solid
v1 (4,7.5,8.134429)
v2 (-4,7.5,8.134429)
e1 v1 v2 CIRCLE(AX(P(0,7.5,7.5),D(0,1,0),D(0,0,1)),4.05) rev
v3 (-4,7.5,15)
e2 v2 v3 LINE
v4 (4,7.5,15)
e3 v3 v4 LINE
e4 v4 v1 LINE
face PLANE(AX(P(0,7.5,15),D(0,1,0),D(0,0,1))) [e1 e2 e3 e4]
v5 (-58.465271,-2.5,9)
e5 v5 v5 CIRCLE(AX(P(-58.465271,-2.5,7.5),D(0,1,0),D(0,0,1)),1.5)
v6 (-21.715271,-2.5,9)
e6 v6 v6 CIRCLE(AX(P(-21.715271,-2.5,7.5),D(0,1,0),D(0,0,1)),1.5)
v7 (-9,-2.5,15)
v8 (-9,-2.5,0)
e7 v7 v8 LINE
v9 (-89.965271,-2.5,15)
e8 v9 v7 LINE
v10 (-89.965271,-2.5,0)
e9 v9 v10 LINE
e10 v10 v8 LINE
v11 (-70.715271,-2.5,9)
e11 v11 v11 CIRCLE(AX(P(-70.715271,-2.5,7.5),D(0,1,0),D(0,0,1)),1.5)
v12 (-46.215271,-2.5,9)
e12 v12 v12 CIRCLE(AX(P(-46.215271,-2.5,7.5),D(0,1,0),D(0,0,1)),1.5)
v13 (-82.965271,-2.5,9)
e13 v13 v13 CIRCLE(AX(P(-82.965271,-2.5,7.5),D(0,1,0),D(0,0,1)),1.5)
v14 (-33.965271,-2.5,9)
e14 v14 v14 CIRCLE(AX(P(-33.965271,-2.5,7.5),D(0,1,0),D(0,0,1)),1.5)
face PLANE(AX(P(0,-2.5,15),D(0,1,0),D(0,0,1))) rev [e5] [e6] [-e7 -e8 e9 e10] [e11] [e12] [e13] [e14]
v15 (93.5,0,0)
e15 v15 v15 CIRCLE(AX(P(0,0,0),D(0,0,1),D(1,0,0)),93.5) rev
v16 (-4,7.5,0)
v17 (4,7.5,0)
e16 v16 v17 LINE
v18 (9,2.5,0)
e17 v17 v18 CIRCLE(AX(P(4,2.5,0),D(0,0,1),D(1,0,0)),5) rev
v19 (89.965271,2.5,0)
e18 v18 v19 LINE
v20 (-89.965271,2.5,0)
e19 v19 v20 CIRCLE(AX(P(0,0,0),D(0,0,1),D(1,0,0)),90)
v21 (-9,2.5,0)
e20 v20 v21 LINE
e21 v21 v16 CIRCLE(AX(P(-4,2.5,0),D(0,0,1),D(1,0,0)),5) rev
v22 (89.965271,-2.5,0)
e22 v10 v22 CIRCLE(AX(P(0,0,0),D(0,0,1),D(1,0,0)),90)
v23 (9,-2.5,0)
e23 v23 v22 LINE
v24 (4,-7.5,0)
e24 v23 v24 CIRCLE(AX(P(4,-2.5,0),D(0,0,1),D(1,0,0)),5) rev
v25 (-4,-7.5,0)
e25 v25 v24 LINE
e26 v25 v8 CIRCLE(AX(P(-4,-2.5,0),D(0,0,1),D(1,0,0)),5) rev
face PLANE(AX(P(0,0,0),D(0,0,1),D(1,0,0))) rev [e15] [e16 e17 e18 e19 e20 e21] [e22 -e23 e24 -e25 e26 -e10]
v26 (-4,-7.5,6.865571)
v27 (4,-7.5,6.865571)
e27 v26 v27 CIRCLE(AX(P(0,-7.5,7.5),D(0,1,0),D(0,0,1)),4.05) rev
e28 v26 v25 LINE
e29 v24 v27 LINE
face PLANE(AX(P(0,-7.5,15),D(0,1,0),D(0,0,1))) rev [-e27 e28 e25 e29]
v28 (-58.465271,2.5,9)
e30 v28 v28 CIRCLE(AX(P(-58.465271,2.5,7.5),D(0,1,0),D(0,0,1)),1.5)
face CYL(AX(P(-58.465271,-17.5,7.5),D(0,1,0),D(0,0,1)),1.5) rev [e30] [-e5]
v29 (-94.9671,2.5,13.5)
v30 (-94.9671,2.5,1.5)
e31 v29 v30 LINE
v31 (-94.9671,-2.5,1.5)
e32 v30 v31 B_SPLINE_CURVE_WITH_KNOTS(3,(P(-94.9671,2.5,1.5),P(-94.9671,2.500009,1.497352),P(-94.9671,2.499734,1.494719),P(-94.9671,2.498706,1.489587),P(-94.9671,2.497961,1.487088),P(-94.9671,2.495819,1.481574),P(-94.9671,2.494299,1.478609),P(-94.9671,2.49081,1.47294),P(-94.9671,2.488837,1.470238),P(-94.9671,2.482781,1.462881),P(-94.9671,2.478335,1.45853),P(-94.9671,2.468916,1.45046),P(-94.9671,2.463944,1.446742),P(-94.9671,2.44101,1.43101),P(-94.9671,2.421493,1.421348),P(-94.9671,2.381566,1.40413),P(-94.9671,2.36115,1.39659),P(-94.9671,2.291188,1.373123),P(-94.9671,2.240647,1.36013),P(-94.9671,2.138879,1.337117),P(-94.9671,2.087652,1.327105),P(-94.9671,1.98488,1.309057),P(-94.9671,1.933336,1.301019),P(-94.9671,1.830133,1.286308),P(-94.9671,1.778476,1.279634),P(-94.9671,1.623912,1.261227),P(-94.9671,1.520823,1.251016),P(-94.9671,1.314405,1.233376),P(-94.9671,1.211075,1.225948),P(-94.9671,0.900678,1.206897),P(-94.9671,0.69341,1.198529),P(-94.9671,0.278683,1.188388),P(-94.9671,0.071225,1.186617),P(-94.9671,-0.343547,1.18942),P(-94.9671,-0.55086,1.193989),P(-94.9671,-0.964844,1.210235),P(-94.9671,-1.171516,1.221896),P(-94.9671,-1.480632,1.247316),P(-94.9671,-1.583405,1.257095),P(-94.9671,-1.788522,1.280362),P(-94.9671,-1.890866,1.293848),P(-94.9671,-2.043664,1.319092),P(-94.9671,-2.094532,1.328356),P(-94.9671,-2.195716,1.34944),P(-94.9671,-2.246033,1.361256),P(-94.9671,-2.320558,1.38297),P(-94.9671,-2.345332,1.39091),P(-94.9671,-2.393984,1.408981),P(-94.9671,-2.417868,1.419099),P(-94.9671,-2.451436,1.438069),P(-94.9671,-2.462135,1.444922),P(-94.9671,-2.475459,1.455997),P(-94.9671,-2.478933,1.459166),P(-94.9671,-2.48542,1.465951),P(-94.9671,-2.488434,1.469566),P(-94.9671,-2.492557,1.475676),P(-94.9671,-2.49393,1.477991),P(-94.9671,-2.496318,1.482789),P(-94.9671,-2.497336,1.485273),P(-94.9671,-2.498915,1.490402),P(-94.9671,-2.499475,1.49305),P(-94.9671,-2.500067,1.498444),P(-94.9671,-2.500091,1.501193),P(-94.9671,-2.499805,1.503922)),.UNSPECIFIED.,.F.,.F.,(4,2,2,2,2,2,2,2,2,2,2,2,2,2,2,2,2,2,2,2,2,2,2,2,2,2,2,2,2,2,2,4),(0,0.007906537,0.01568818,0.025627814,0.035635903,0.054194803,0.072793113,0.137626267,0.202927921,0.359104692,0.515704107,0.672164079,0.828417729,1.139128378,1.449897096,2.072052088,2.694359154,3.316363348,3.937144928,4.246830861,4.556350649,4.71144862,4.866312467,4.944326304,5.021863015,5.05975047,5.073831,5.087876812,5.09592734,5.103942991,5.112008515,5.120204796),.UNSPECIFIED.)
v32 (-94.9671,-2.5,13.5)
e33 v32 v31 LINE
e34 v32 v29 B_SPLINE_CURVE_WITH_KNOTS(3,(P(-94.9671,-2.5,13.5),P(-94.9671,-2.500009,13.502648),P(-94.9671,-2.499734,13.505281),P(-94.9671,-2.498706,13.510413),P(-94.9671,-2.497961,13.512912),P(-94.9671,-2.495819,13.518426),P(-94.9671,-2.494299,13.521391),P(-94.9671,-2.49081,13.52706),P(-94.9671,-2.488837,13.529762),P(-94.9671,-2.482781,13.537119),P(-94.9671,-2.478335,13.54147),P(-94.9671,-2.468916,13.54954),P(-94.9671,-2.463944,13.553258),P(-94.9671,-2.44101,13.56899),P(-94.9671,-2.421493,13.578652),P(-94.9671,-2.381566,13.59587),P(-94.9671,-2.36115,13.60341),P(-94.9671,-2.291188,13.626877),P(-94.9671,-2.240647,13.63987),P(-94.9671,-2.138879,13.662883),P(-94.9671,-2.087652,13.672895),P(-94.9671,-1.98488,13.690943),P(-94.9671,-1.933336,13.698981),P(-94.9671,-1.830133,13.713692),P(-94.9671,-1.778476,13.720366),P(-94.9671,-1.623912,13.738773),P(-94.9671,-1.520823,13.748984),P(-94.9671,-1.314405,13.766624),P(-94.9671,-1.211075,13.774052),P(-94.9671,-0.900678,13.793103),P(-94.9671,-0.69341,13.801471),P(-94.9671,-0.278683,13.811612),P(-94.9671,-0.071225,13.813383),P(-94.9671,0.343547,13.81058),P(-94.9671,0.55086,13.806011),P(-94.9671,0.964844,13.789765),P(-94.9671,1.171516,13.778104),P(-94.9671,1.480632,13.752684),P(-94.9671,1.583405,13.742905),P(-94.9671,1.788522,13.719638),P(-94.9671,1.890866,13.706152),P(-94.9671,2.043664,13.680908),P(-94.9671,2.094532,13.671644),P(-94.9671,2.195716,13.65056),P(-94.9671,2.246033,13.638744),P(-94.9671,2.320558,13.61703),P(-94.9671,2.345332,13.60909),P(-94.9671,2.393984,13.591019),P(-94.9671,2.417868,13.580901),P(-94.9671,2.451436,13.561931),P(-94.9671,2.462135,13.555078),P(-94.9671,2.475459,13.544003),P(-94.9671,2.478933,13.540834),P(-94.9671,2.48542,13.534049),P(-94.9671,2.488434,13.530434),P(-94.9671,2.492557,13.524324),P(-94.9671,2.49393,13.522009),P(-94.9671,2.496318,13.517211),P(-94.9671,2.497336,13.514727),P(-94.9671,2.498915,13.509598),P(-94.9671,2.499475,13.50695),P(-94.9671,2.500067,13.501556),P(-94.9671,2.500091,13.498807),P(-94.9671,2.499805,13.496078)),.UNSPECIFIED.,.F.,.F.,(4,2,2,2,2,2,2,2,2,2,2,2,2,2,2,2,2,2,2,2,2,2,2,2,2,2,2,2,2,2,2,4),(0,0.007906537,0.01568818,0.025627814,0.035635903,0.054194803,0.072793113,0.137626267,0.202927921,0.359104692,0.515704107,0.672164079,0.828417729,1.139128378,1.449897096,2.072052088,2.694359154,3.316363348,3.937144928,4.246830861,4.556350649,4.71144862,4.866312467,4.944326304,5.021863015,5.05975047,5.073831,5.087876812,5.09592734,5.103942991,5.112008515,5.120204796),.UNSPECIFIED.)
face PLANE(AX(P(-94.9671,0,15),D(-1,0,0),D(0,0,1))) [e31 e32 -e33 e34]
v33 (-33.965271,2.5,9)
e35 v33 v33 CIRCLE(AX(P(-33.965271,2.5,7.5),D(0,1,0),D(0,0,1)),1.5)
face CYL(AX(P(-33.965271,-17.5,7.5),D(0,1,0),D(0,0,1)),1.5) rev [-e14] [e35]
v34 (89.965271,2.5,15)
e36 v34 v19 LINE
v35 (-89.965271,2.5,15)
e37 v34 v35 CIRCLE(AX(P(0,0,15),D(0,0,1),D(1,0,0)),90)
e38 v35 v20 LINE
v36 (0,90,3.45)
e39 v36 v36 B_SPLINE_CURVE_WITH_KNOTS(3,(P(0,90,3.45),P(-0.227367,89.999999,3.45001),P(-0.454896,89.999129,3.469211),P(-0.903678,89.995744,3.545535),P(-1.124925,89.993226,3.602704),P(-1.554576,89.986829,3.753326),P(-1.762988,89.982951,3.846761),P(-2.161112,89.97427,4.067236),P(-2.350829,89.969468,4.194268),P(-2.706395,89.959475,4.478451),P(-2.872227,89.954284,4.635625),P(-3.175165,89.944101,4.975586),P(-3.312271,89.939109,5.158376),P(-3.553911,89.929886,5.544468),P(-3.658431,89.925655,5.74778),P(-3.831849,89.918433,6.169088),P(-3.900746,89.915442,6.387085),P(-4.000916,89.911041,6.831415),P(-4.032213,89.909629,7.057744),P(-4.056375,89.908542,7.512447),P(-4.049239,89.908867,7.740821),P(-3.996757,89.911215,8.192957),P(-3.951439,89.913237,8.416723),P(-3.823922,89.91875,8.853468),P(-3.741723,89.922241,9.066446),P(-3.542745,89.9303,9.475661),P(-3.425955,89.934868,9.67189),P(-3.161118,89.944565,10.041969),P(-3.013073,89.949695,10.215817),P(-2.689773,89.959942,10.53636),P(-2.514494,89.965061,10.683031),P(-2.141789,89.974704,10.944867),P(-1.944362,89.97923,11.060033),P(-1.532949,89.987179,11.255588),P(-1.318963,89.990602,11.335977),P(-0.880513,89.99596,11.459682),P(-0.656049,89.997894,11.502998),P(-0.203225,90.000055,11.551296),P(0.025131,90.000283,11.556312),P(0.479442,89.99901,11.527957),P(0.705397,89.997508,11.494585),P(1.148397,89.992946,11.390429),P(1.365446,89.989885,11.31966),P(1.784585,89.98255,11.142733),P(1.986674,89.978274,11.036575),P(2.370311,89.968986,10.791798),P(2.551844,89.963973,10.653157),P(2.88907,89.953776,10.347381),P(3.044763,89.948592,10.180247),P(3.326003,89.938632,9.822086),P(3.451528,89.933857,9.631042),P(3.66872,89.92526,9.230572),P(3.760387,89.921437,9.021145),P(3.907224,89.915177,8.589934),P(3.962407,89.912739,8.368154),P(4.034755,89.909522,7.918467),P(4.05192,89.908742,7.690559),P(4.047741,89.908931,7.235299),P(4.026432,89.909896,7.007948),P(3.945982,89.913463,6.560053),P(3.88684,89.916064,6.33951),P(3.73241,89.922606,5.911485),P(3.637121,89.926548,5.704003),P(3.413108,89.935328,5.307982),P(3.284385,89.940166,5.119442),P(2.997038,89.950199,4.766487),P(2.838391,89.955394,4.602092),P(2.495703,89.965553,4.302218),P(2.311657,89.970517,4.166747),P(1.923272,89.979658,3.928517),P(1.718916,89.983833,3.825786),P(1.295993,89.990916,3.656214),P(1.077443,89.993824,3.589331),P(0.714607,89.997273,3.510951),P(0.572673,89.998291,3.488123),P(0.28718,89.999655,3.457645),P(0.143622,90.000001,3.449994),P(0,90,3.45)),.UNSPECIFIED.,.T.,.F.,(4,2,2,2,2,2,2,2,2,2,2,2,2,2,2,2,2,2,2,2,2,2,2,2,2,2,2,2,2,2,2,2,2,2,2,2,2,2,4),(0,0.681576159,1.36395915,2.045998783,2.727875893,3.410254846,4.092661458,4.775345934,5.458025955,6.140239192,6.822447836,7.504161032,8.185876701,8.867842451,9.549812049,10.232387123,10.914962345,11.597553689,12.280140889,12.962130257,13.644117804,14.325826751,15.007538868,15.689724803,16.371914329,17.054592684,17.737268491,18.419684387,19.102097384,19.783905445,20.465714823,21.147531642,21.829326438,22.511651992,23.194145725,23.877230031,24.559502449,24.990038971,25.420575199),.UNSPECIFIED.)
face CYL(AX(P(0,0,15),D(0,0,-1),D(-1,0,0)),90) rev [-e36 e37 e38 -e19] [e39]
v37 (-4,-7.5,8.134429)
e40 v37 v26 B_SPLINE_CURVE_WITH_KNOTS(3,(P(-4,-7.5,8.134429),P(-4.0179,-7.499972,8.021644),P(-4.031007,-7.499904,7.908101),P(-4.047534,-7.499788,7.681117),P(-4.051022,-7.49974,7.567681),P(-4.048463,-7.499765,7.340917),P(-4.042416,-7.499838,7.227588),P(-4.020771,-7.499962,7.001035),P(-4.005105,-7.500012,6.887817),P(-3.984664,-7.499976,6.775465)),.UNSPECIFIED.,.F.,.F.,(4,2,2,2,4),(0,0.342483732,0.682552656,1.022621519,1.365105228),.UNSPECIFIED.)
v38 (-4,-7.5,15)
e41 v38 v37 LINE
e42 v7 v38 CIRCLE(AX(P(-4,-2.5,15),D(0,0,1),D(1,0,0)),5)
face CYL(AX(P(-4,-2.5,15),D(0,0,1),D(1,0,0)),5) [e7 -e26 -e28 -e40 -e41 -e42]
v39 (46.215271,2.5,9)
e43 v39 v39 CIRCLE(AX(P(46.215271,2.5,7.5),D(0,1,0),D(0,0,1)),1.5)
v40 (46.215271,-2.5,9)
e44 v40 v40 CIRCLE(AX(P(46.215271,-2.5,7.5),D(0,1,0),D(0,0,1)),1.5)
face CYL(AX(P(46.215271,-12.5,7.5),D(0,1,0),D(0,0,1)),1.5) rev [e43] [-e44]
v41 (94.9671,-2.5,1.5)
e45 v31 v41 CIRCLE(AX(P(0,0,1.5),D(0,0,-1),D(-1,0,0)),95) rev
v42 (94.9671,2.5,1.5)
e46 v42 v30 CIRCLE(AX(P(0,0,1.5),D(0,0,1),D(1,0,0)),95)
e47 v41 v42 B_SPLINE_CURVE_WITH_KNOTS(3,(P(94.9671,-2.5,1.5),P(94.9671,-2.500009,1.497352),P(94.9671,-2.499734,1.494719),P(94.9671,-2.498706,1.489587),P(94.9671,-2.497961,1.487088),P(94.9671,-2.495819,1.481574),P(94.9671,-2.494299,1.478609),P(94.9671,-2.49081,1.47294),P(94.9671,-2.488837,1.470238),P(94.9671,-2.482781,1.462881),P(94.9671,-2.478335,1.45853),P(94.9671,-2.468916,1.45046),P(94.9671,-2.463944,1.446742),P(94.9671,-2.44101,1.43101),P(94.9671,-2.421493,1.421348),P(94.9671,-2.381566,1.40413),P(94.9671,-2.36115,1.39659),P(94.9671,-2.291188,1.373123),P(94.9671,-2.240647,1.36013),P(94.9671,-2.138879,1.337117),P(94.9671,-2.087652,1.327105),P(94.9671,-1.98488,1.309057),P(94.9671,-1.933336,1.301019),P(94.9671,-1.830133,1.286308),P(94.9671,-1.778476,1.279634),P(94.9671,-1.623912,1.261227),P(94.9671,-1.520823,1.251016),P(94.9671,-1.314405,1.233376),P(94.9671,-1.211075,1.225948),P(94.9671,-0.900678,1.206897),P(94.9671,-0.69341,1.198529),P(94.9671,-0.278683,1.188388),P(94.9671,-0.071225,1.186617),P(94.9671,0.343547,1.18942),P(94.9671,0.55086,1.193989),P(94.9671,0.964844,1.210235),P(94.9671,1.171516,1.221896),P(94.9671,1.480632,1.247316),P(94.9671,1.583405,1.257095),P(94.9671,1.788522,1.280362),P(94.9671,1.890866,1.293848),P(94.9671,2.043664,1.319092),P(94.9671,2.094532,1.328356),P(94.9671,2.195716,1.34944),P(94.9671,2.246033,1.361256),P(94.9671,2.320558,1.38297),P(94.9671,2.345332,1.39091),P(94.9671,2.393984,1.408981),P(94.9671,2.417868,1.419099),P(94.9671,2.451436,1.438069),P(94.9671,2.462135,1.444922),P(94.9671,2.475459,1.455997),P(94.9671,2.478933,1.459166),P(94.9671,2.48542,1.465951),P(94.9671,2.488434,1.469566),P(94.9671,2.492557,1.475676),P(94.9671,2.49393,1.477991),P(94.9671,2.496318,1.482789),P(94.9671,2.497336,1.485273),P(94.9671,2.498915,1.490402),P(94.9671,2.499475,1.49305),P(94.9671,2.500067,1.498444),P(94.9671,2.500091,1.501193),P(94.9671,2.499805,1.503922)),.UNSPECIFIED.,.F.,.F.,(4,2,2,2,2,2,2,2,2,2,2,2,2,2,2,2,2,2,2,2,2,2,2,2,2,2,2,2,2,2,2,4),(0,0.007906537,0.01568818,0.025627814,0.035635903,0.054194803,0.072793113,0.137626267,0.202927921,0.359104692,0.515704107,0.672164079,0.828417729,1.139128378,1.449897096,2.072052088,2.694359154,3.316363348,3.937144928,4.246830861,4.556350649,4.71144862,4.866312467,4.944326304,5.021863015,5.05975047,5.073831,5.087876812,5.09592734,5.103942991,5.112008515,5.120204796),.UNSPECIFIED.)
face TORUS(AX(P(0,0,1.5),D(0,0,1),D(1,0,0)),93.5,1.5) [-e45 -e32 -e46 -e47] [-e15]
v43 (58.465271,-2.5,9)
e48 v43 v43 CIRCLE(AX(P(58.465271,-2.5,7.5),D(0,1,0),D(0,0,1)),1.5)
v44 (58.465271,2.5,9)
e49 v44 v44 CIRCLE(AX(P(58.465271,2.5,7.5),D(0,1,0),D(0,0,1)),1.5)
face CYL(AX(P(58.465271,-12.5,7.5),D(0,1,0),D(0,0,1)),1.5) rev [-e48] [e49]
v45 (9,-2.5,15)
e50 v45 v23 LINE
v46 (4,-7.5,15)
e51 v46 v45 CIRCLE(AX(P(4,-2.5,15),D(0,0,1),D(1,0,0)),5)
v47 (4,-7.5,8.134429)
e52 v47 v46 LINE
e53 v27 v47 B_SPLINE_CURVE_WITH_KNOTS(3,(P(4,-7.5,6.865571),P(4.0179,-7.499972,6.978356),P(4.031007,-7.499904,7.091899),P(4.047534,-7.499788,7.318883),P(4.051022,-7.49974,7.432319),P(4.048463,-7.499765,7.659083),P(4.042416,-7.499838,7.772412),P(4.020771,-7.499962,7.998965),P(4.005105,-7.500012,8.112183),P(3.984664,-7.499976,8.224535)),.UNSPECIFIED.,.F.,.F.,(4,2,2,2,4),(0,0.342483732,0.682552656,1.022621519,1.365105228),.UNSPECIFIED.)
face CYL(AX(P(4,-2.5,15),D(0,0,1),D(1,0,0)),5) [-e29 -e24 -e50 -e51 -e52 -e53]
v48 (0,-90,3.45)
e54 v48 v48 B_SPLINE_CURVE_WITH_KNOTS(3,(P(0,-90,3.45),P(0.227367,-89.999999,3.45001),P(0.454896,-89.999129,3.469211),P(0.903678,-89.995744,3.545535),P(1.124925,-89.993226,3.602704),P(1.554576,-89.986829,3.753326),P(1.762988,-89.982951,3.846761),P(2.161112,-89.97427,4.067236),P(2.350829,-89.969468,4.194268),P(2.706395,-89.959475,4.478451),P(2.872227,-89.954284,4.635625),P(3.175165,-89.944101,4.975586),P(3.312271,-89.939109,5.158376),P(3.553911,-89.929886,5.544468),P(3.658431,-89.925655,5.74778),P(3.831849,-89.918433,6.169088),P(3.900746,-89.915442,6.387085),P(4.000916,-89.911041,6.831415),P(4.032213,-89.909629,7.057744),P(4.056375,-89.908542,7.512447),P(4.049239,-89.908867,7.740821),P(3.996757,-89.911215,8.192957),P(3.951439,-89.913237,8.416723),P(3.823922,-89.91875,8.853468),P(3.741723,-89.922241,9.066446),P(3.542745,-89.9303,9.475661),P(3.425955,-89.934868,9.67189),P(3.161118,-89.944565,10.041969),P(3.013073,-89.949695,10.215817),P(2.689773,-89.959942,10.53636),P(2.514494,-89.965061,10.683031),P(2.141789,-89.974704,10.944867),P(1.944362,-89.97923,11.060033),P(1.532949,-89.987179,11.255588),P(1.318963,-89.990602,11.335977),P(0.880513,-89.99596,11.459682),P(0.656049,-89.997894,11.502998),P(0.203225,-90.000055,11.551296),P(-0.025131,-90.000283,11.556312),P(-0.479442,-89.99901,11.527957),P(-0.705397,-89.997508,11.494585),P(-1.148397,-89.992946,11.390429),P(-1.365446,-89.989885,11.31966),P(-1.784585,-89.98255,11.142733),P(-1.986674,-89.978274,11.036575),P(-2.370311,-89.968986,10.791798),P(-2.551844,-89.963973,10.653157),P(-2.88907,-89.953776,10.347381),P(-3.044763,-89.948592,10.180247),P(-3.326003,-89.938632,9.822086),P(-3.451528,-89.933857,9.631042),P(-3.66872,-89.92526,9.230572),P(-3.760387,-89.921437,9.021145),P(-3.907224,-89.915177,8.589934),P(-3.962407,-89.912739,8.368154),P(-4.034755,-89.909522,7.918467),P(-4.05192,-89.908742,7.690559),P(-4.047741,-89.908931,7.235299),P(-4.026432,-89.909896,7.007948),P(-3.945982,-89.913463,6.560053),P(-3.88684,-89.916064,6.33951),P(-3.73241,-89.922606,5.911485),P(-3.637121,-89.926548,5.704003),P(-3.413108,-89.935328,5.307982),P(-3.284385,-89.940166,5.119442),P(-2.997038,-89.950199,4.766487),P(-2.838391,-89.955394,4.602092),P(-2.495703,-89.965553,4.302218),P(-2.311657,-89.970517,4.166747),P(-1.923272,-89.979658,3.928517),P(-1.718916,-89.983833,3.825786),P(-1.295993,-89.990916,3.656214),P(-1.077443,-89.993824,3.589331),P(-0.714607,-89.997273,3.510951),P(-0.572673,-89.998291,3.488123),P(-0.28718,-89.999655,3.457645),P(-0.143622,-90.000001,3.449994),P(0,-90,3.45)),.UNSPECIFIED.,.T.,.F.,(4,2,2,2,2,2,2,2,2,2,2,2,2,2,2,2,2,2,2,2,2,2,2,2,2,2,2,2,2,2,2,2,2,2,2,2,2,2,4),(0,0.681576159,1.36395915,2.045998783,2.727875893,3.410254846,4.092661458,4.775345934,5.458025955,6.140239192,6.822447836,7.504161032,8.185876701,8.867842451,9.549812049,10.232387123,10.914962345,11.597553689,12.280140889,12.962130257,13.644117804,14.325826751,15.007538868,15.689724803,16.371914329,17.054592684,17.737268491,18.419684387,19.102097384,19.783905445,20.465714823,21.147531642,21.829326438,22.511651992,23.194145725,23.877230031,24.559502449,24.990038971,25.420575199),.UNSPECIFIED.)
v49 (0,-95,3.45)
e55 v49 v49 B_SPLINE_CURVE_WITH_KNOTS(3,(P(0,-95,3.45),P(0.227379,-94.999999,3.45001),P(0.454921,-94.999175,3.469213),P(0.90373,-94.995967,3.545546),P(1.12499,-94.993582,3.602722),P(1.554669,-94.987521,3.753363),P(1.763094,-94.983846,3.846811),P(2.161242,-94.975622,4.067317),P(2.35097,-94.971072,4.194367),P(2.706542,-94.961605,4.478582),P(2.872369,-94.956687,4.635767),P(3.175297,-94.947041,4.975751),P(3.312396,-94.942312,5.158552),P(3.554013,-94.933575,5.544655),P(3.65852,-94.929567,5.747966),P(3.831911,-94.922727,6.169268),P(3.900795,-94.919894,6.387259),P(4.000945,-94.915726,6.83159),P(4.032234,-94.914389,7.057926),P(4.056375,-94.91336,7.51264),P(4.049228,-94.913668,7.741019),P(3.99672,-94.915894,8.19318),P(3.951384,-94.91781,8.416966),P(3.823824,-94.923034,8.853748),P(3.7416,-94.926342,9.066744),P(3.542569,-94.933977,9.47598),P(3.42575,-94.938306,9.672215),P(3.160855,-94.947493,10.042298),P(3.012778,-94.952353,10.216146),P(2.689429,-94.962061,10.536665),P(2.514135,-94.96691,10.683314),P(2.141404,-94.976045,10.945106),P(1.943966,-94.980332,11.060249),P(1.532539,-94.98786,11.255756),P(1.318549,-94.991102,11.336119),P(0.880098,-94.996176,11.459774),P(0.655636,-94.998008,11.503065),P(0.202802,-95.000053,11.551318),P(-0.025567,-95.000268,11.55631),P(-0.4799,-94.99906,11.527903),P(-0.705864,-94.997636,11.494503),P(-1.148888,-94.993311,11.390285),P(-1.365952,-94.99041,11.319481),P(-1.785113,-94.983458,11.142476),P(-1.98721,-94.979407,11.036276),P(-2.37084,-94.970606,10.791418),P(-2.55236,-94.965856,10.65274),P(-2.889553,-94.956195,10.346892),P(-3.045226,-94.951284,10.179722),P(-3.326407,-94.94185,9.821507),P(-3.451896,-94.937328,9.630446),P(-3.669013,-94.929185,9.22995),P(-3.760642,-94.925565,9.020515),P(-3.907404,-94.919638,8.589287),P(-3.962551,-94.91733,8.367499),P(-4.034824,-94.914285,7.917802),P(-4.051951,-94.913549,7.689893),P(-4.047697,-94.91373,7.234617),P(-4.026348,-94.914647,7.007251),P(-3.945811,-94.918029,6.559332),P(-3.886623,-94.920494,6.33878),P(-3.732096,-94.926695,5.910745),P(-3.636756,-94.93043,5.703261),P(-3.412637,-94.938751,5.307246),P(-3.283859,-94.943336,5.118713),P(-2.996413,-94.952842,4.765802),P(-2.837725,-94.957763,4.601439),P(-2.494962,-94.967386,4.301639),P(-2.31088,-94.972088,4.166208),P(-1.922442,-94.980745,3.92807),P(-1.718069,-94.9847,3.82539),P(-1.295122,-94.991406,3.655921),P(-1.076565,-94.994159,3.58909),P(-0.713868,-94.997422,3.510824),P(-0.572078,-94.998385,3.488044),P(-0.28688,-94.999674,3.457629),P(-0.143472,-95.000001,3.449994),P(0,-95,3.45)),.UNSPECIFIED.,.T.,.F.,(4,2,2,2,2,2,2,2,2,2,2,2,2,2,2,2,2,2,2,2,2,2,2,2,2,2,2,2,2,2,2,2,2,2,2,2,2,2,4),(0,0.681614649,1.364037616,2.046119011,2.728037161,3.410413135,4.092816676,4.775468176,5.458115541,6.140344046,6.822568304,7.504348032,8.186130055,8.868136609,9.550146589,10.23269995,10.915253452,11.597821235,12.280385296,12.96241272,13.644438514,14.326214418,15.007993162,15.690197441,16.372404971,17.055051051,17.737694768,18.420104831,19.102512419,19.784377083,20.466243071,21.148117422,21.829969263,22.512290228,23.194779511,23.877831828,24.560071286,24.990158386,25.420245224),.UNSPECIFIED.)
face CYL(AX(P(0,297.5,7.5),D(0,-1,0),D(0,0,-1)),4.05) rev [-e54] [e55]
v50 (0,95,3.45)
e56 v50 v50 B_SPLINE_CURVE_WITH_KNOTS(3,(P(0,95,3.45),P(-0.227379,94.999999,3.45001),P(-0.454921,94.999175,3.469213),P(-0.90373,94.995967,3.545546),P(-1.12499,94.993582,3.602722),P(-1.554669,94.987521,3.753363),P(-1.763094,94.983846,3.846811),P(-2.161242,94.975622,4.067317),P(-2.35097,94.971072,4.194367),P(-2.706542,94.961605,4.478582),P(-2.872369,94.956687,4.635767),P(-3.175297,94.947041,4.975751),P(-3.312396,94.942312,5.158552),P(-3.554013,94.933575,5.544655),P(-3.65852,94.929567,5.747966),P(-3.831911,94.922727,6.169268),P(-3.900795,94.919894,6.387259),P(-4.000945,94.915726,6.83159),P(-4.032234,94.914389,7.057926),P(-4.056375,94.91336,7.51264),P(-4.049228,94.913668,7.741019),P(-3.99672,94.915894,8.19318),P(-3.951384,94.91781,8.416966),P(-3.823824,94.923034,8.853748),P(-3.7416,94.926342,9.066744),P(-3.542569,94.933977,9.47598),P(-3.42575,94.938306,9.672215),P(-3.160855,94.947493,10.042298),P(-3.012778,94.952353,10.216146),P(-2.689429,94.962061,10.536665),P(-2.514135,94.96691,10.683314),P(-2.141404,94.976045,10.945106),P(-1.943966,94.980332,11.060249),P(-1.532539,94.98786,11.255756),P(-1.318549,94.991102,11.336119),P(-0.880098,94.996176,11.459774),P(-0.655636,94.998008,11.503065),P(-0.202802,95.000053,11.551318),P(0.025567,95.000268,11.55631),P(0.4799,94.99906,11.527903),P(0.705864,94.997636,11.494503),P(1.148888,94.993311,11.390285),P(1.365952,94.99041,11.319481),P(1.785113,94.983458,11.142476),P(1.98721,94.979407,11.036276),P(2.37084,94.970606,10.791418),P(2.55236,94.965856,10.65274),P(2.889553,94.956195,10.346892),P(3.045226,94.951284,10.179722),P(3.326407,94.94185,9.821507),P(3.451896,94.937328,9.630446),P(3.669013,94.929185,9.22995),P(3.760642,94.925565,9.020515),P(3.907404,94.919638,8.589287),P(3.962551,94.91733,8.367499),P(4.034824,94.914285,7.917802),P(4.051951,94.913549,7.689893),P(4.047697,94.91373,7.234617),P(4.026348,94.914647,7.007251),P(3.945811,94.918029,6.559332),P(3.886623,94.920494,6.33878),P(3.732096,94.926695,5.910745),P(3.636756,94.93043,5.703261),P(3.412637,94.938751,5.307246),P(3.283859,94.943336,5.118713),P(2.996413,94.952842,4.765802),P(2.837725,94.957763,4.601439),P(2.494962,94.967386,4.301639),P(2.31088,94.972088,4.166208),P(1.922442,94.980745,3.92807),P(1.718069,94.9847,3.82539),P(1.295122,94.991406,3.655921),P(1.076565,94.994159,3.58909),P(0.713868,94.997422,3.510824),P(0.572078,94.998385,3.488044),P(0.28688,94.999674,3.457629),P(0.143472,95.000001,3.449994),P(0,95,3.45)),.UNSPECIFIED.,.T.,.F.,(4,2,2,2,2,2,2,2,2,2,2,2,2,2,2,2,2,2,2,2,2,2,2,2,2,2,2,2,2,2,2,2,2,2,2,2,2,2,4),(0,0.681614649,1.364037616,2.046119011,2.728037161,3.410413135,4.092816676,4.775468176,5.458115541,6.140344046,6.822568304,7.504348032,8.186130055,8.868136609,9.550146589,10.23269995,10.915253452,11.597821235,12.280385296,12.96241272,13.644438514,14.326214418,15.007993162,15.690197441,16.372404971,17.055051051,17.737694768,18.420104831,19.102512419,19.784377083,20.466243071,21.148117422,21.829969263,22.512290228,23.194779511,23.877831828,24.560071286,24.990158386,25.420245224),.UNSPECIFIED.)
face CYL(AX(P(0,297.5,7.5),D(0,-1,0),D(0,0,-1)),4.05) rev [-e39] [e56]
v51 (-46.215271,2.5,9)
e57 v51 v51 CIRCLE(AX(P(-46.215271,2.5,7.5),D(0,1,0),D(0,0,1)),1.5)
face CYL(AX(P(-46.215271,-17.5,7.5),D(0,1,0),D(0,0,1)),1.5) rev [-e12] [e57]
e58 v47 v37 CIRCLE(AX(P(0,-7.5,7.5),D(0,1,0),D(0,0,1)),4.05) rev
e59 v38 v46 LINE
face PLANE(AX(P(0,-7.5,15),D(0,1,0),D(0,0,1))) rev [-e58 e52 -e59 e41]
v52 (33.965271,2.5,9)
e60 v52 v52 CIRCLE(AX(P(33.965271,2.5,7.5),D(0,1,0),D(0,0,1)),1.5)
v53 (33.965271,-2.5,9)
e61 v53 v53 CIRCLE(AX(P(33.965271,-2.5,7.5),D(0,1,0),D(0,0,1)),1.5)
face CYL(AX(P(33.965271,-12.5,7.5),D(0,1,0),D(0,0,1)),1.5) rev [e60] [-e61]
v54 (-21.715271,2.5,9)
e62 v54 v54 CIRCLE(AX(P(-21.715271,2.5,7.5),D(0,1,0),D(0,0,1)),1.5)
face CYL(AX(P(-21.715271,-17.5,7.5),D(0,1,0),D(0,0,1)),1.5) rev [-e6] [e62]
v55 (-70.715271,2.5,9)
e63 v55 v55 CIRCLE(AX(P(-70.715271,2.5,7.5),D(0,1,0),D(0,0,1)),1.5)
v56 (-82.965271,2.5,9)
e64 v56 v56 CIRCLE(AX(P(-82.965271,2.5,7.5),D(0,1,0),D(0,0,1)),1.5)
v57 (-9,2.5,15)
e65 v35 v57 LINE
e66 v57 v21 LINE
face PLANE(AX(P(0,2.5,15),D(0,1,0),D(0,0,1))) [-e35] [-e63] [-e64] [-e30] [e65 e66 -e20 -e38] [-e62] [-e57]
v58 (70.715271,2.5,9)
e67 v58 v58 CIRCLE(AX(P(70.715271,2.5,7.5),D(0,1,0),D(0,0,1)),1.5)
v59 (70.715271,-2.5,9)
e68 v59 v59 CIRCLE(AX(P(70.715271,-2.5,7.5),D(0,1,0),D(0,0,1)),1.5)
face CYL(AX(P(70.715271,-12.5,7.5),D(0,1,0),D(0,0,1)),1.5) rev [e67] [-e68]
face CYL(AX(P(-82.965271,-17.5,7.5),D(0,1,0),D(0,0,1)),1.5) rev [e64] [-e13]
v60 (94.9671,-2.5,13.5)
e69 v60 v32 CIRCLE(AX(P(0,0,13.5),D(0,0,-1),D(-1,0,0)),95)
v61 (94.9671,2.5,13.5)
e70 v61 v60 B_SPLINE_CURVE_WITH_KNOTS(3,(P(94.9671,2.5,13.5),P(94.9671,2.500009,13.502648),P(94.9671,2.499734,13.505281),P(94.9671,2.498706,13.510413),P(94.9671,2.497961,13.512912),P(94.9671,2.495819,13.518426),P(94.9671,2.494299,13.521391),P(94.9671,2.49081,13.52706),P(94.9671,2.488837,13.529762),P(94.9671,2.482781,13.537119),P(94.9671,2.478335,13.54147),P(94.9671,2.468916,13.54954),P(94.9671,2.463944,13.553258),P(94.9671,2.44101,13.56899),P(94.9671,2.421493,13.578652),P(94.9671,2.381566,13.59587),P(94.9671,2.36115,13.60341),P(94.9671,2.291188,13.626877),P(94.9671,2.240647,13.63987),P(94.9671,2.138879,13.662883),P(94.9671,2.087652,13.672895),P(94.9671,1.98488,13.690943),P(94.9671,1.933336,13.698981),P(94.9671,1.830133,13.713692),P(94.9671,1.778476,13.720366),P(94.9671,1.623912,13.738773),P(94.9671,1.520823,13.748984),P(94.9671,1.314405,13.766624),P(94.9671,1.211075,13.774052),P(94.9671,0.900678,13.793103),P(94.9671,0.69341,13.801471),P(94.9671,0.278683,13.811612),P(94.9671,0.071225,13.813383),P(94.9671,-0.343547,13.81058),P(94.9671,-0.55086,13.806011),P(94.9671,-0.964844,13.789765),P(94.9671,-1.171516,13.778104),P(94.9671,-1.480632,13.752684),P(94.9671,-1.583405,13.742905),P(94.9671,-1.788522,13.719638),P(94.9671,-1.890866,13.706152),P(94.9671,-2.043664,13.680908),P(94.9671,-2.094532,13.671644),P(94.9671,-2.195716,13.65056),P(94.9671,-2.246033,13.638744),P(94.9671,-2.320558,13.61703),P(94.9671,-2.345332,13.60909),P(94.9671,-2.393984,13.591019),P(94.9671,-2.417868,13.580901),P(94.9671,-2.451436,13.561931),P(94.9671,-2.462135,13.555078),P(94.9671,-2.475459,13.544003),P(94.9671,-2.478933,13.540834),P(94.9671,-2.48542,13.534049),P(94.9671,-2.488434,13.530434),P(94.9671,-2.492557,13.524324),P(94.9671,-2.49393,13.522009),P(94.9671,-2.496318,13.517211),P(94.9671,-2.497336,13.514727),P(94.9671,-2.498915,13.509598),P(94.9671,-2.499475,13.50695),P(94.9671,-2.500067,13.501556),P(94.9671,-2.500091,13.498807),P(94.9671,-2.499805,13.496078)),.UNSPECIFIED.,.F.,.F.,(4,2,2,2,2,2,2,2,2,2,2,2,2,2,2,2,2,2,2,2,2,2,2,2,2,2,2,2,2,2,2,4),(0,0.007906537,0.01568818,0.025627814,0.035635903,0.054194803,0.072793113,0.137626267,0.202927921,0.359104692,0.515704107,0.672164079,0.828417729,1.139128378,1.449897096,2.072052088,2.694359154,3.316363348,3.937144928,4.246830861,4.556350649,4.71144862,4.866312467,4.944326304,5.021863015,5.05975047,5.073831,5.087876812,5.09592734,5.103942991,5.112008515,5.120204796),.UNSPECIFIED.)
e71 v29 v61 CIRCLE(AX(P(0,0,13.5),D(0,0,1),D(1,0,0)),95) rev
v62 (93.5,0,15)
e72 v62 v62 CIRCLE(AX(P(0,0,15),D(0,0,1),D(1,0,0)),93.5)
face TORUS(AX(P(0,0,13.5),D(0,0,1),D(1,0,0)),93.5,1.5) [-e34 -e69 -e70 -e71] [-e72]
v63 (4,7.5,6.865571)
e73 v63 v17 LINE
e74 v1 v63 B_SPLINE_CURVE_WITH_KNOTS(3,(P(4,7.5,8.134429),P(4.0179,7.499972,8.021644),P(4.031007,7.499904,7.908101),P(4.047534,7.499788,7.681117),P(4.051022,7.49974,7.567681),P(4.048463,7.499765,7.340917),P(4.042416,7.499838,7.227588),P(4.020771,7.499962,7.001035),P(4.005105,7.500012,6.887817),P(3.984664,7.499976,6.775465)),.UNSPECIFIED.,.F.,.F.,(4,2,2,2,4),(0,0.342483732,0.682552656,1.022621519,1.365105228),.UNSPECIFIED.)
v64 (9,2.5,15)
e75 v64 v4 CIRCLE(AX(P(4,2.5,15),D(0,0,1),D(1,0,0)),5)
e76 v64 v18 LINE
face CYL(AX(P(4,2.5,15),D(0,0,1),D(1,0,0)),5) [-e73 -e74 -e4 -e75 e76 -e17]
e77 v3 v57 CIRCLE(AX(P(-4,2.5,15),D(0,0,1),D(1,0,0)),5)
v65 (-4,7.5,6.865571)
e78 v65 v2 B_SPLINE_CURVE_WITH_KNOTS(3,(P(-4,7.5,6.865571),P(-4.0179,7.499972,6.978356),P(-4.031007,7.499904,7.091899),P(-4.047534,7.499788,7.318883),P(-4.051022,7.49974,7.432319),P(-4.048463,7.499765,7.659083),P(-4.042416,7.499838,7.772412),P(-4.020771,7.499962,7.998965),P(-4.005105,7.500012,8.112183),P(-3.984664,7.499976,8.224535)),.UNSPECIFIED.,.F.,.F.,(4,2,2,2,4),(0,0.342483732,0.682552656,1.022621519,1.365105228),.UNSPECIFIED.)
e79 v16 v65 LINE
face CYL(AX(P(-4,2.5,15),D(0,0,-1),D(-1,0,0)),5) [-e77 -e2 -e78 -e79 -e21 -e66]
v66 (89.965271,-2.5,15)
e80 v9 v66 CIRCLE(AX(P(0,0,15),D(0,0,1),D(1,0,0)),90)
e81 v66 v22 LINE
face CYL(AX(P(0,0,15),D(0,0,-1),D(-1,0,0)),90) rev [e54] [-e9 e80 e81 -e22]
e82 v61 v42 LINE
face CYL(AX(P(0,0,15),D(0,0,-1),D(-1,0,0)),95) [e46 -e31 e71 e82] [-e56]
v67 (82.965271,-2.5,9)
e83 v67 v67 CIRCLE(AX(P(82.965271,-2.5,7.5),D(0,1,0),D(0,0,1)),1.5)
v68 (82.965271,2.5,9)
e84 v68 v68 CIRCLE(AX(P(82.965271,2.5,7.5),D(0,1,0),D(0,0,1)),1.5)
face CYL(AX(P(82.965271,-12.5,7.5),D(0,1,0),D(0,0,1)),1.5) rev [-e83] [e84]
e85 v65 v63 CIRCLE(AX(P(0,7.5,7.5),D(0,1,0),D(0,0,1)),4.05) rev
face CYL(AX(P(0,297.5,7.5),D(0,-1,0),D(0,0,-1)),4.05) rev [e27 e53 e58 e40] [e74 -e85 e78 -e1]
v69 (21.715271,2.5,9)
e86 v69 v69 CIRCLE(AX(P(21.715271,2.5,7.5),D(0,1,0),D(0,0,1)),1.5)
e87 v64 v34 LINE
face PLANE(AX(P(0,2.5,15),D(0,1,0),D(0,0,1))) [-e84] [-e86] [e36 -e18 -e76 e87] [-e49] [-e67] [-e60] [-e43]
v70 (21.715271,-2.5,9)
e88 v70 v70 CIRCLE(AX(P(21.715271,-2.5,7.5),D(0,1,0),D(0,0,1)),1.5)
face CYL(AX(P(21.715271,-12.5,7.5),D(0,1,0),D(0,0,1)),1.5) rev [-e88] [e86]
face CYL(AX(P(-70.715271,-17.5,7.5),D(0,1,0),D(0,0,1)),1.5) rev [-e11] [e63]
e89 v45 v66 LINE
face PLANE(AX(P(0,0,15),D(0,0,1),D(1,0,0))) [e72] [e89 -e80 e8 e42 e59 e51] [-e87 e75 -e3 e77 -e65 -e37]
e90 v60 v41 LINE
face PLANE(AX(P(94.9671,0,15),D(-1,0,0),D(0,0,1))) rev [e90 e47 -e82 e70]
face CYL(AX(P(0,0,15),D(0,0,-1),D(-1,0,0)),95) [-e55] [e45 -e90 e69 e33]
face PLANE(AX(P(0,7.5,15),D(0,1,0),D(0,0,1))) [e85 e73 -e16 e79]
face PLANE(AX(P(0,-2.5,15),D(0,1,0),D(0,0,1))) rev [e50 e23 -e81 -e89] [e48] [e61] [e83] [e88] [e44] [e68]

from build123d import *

# Parameters (mm, degrees)
SKETCH1_W               = 18
SKETCH1_H               = 5
BOSS_EXTRUDE1_DEPTH     = 15
SKETCH2_R               = 1.5
CUT_EXTRUDE1_DEPTH      = 20
SKETCH3_R               = 1.5
CUT_EXTRUDE2_DEPTH      = 15
CUT_EXTRUDE3_DEPTH      = 290
CUT_EXTRUDE3_DEPTH_BACK = 330
SKETCH4_R               = 4.05
LPATTERN3_COUNT         = 6
LPATTERN3_PITCH         = 12.25
LPATTERN4_COUNT         = 6
LPATTERN4_PITCH         = 12.25
FILLET1_R               = 5
FILLET2_R               = 5
FILLET3_R               = 5
FILLET4_R               = 5
FILLET5_R               = 1.5
FILLET6_R               = 1.5


# Some blends are built 0.0001 mm under size
with BuildPart() as part:
    # Sketch1 → Boss-Extrude1 (new body)
    with BuildSketch(Plane.XY):
        with BuildLine():
            ThreePointArc((94.967099566, 2.5), (0, 95), (-94.967099566, 2.5))
            Line((-94.967099566, 2.5), (-89.965271077, 2.5))
            ThreePointArc((-89.965271077, 2.5), (0, 90), (89.965271077, 2.5))
            Line((89.965271077, 2.5), (94.967099566, 2.5))
        make_face()
        with BuildLine():
            Line((-89.965271077, -2.5), (-94.967099566, -2.5))
            ThreePointArc((-94.967099566, -2.5), (0, -95), (94.967099566, -2.5))
            Line((94.967099566, -2.5), (89.965271077, -2.5))
            ThreePointArc((89.965271077, -2.5), (0, -90), (-89.965271077, -2.5))
        make_face()
        with BuildLine():
            Line((-94.967099566, 2.5), (-94.967099566, -2.5))
            Line((-94.967099566, -2.5), (-89.965271077, -2.5))
            ThreePointArc((-89.965271077, -2.5), (-90, 0), (-89.965271077, 2.5))
            Line((-89.965271077, 2.5), (-94.967099566, 2.5))
        make_face()
        with BuildLine():
            ThreePointArc((-89.965271077, 2.5), (-90, 0), (-89.965271077, -2.5))
            Line((-89.965271077, -2.5), (-9, -2.5))
            Line((-9, -2.5), (-9, 2.5))
            Line((-9, 2.5), (-89.965271077, 2.5))
        make_face()
        with BuildLine():
            Line((9, -2.5), (89.965271077, -2.5))
            ThreePointArc((89.965271077, -2.5), (89.99131735, -1.250120604), (90, 0))
            ThreePointArc((90, 0), (89.99131735, 1.250120604), (89.965271077, 2.5))
            Line((89.965271077, 2.5), (9, 2.5))
            Line((9, 2.5), (9, -2.5))
        make_face()
        with BuildLine():
            Line((89.965271077, -2.5), (94.967099566, -2.5))
            Line((94.967099566, -2.5), (94.967099566, 2.5))
            Line((94.967099566, 2.5), (89.965271077, 2.5))
            ThreePointArc((89.965271077, 2.5), (89.99131735, 1.250120604), (90, 0))
            ThreePointArc((90, 0), (89.99131735, -1.250120604), (89.965271077, -2.5))
        make_face()
        Rectangle(SKETCH1_W, SKETCH1_H)
        with Locations((0, 5)):
            Rectangle(SKETCH1_W, SKETCH1_H)
        with Locations((0, -5)):
            Rectangle(SKETCH1_W, SKETCH1_H)
    extrude(amount=BOSS_EXTRUDE1_DEPTH)

    # Sketch2 → Cut-Extrude1 (cut)
    with BuildSketch(Plane(origin=(0, 2.5, 0), x_dir=(1, 0, 0), z_dir=(0, 1, 0))):
        with Locations(Location((-82.965271077, -7.5, 0), (0, 0, 270))):
            Circle(SKETCH2_R)
    cut_extrude1 = extrude(amount=-CUT_EXTRUDE1_DEPTH, mode=Mode.SUBTRACT)

    # Sketch3 → Cut-Extrude2 (cut)
    with BuildSketch(Plane(origin=(0, 2.5, 0), x_dir=(1, 0, 0), z_dir=(0, 1, 0))):
        with Locations(Location((82.965271077, -7.5, 0), (0, 0, 270))):
            Circle(SKETCH3_R)
    cut_extrude2 = extrude(amount=-CUT_EXTRUDE2_DEPTH, mode=Mode.SUBTRACT)

    # Sketch4 → Cut-Extrude3 (cut, two sides: drawn at the far end of the back side and taken through both)
    with BuildSketch(Plane(origin=(0, 7.5, 0), x_dir=(1, 0, 0), z_dir=(0, 1, 0)).offset(-CUT_EXTRUDE3_DEPTH_BACK)):
        with Locations(Location((0, -7.5, 0), (0, 0, 90))):
            Circle(SKETCH4_R)
    extrude(amount=CUT_EXTRUDE3_DEPTH + CUT_EXTRUDE3_DEPTH_BACK, mode=Mode.SUBTRACT)

    # LPattern3: Cut-Extrude2 ×6
    with Locations(*[(-i * LPATTERN3_PITCH, 0, 0) for i in range(1, LPATTERN3_COUNT)]):
        add(cut_extrude2, mode=Mode.SUBTRACT)

    # LPattern4: Cut-Extrude1 ×6
    with Locations(*[(i * LPATTERN4_PITCH, 0, 0) for i in range(1, LPATTERN4_COUNT)]):
        add(cut_extrude1, mode=Mode.SUBTRACT)

    # Fillet1
    fillet1_edges = [part.edges().sort_by_distance(p)[0] for p in [
        (-9, 7.5, 7.5),
    ]]
    fillet(fillet1_edges, radius=FILLET1_R - 0.0001)  # a hair under: the kernel refuses the full size

    # Fillet2
    fillet2_edges = [part.edges().sort_by_distance(p)[0] for p in [
        (9, 7.5, 7.5),
    ]]
    fillet(fillet2_edges, radius=FILLET2_R - 0.0001)  # a hair under: the kernel refuses the full size

    # Fillet3
    fillet3_edges = [part.edges().sort_by_distance(p)[0] for p in [
        (9, -7.5, 7.5),
    ]]
    fillet(fillet3_edges, radius=FILLET3_R - 0.0001)  # a hair under: the kernel refuses the full size

    # Fillet4
    fillet4_edges = [part.edges().sort_by_distance(p)[0] for p in [
        (-9, -7.5, 7.5),
    ]]
    fillet(fillet4_edges, radius=FILLET4_R - 0.0001)  # a hair under: the kernel refuses the full size

    # Fillet5
    # the kernel refuses this fillet: 1.5 mm, written as the material it takes off along each edge
    with BuildSketch(Plane(origin=(0, 0, 15), x_dir=(-0.9999126669586381, 0.013215841088011512, 0), z_dir=(0.013215841088011512, 0.9999126669586381, 0))) as fillet5_piece_1:
        with BuildLine():
            CenterArc((95 - FILLET5_R, -FILLET5_R), FILLET5_R, 0, 90)
            Line((95 - FILLET5_R, 0), (95, 0))
            Line((95, 0), (95, -FILLET5_R))
        make_face()
    revolve(axis=Axis((0, 0, 15), (0, 0, 1)), revolution_arc=181.514467922, mode=Mode.SUBTRACT)
    with BuildSketch(Plane(origin=(0, 0, 15), x_dir=(0.9999126669586381, -0.013215841088011463, 0), z_dir=(-0.013215841088011463, -0.9999126669586381, 0))) as fillet5_piece_2:
        with BuildLine():
            CenterArc((95 - FILLET5_R, -FILLET5_R), FILLET5_R, 0, 90)
            Line((95 - FILLET5_R, 0), (95, 0))
            Line((95, 0), (95, -FILLET5_R))
        make_face()
    revolve(axis=Axis((0, 0, 15), (0, 0, 1)), revolution_arc=181.514467922, mode=Mode.SUBTRACT)

    # Fillet6
    # the kernel refuses this fillet: 1.5 mm, written as the material it takes off along each edge
    with BuildSketch(Plane(origin=(0, 0, 0), x_dir=(0.9999126669586381, -0.013215841088011463, 0), z_dir=(-0.013215841088011463, -0.9999126669586381, 0))) as fillet6_piece_1_section:
        with BuildLine():
            CenterArc((95 - FILLET6_R, FILLET6_R), FILLET6_R, 270, 90)
            Line((95, FILLET6_R), (95 + FILLET6_R * 0.02, FILLET6_R))
            Line((95 + FILLET6_R * 0.02, FILLET6_R), (95 + FILLET6_R * 0.02, -FILLET6_R * 0.02))
            Line((95 + FILLET6_R * 0.02, -FILLET6_R * 0.02), (95 - FILLET6_R, -FILLET6_R * 0.02))
            Line((95 - FILLET6_R, -FILLET6_R * 0.02), (95 - FILLET6_R, 0))
        make_face()
    fillet6_piece_1 = revolve(axis=Axis((0, 0, 0), (0, 0, 1)), revolution_arc=181.514467922, mode=Mode.PRIVATE)
    fillet6_piece_1 = split(fillet6_piece_1, bisect_by=Plane(origin=(-94.967099566, 94.599989904, 0.400010096), z_dir=(1, 0, 0)), keep=Keep.TOP, mode=Mode.PRIVATE)
    fillet6_piece_1 = split(fillet6_piece_1, bisect_by=Plane(origin=(94.967099566, 94.599989904, 0.400010096), z_dir=(-1, 0, 0)), keep=Keep.TOP, mode=Mode.PRIVATE)
    with BuildSketch(Plane(origin=(0, 0, 0), x_dir=(-0.9999126669586381, 0.013215841088011512, 0), z_dir=(0.013215841088011512, 0.9999126669586381, 0))) as fillet6_piece_2_section:
        with BuildLine():
            CenterArc((95 - FILLET6_R, FILLET6_R), FILLET6_R, 270, 90)
            Line((95, FILLET6_R), (95 + FILLET6_R * 0.02, FILLET6_R))
            Line((95 + FILLET6_R * 0.02, FILLET6_R), (95 + FILLET6_R * 0.02, -FILLET6_R * 0.02))
            Line((95 + FILLET6_R * 0.02, -FILLET6_R * 0.02), (95 - FILLET6_R, -FILLET6_R * 0.02))
            Line((95 - FILLET6_R, -FILLET6_R * 0.02), (95 - FILLET6_R, 0))
        make_face()
    fillet6_piece_2 = revolve(axis=Axis((0, 0, 0), (0, 0, 1)), revolution_arc=181.514467922, mode=Mode.PRIVATE)
    fillet6_piece_2 = split(fillet6_piece_2, bisect_by=Plane(origin=(-94.967099566, -94.599989904, 0.400010096), z_dir=(1, 0, 0)), keep=Keep.TOP, mode=Mode.PRIVATE)
    fillet6_piece_2 = split(fillet6_piece_2, bisect_by=Plane(origin=(94.967099566, -94.599989904, 0.400010096), z_dir=(-1, 0, 0)), keep=Keep.TOP, mode=Mode.PRIVATE)
    add([fillet6_piece_1, fillet6_piece_2], mode=Mode.SUBTRACT)


solid = part.part
